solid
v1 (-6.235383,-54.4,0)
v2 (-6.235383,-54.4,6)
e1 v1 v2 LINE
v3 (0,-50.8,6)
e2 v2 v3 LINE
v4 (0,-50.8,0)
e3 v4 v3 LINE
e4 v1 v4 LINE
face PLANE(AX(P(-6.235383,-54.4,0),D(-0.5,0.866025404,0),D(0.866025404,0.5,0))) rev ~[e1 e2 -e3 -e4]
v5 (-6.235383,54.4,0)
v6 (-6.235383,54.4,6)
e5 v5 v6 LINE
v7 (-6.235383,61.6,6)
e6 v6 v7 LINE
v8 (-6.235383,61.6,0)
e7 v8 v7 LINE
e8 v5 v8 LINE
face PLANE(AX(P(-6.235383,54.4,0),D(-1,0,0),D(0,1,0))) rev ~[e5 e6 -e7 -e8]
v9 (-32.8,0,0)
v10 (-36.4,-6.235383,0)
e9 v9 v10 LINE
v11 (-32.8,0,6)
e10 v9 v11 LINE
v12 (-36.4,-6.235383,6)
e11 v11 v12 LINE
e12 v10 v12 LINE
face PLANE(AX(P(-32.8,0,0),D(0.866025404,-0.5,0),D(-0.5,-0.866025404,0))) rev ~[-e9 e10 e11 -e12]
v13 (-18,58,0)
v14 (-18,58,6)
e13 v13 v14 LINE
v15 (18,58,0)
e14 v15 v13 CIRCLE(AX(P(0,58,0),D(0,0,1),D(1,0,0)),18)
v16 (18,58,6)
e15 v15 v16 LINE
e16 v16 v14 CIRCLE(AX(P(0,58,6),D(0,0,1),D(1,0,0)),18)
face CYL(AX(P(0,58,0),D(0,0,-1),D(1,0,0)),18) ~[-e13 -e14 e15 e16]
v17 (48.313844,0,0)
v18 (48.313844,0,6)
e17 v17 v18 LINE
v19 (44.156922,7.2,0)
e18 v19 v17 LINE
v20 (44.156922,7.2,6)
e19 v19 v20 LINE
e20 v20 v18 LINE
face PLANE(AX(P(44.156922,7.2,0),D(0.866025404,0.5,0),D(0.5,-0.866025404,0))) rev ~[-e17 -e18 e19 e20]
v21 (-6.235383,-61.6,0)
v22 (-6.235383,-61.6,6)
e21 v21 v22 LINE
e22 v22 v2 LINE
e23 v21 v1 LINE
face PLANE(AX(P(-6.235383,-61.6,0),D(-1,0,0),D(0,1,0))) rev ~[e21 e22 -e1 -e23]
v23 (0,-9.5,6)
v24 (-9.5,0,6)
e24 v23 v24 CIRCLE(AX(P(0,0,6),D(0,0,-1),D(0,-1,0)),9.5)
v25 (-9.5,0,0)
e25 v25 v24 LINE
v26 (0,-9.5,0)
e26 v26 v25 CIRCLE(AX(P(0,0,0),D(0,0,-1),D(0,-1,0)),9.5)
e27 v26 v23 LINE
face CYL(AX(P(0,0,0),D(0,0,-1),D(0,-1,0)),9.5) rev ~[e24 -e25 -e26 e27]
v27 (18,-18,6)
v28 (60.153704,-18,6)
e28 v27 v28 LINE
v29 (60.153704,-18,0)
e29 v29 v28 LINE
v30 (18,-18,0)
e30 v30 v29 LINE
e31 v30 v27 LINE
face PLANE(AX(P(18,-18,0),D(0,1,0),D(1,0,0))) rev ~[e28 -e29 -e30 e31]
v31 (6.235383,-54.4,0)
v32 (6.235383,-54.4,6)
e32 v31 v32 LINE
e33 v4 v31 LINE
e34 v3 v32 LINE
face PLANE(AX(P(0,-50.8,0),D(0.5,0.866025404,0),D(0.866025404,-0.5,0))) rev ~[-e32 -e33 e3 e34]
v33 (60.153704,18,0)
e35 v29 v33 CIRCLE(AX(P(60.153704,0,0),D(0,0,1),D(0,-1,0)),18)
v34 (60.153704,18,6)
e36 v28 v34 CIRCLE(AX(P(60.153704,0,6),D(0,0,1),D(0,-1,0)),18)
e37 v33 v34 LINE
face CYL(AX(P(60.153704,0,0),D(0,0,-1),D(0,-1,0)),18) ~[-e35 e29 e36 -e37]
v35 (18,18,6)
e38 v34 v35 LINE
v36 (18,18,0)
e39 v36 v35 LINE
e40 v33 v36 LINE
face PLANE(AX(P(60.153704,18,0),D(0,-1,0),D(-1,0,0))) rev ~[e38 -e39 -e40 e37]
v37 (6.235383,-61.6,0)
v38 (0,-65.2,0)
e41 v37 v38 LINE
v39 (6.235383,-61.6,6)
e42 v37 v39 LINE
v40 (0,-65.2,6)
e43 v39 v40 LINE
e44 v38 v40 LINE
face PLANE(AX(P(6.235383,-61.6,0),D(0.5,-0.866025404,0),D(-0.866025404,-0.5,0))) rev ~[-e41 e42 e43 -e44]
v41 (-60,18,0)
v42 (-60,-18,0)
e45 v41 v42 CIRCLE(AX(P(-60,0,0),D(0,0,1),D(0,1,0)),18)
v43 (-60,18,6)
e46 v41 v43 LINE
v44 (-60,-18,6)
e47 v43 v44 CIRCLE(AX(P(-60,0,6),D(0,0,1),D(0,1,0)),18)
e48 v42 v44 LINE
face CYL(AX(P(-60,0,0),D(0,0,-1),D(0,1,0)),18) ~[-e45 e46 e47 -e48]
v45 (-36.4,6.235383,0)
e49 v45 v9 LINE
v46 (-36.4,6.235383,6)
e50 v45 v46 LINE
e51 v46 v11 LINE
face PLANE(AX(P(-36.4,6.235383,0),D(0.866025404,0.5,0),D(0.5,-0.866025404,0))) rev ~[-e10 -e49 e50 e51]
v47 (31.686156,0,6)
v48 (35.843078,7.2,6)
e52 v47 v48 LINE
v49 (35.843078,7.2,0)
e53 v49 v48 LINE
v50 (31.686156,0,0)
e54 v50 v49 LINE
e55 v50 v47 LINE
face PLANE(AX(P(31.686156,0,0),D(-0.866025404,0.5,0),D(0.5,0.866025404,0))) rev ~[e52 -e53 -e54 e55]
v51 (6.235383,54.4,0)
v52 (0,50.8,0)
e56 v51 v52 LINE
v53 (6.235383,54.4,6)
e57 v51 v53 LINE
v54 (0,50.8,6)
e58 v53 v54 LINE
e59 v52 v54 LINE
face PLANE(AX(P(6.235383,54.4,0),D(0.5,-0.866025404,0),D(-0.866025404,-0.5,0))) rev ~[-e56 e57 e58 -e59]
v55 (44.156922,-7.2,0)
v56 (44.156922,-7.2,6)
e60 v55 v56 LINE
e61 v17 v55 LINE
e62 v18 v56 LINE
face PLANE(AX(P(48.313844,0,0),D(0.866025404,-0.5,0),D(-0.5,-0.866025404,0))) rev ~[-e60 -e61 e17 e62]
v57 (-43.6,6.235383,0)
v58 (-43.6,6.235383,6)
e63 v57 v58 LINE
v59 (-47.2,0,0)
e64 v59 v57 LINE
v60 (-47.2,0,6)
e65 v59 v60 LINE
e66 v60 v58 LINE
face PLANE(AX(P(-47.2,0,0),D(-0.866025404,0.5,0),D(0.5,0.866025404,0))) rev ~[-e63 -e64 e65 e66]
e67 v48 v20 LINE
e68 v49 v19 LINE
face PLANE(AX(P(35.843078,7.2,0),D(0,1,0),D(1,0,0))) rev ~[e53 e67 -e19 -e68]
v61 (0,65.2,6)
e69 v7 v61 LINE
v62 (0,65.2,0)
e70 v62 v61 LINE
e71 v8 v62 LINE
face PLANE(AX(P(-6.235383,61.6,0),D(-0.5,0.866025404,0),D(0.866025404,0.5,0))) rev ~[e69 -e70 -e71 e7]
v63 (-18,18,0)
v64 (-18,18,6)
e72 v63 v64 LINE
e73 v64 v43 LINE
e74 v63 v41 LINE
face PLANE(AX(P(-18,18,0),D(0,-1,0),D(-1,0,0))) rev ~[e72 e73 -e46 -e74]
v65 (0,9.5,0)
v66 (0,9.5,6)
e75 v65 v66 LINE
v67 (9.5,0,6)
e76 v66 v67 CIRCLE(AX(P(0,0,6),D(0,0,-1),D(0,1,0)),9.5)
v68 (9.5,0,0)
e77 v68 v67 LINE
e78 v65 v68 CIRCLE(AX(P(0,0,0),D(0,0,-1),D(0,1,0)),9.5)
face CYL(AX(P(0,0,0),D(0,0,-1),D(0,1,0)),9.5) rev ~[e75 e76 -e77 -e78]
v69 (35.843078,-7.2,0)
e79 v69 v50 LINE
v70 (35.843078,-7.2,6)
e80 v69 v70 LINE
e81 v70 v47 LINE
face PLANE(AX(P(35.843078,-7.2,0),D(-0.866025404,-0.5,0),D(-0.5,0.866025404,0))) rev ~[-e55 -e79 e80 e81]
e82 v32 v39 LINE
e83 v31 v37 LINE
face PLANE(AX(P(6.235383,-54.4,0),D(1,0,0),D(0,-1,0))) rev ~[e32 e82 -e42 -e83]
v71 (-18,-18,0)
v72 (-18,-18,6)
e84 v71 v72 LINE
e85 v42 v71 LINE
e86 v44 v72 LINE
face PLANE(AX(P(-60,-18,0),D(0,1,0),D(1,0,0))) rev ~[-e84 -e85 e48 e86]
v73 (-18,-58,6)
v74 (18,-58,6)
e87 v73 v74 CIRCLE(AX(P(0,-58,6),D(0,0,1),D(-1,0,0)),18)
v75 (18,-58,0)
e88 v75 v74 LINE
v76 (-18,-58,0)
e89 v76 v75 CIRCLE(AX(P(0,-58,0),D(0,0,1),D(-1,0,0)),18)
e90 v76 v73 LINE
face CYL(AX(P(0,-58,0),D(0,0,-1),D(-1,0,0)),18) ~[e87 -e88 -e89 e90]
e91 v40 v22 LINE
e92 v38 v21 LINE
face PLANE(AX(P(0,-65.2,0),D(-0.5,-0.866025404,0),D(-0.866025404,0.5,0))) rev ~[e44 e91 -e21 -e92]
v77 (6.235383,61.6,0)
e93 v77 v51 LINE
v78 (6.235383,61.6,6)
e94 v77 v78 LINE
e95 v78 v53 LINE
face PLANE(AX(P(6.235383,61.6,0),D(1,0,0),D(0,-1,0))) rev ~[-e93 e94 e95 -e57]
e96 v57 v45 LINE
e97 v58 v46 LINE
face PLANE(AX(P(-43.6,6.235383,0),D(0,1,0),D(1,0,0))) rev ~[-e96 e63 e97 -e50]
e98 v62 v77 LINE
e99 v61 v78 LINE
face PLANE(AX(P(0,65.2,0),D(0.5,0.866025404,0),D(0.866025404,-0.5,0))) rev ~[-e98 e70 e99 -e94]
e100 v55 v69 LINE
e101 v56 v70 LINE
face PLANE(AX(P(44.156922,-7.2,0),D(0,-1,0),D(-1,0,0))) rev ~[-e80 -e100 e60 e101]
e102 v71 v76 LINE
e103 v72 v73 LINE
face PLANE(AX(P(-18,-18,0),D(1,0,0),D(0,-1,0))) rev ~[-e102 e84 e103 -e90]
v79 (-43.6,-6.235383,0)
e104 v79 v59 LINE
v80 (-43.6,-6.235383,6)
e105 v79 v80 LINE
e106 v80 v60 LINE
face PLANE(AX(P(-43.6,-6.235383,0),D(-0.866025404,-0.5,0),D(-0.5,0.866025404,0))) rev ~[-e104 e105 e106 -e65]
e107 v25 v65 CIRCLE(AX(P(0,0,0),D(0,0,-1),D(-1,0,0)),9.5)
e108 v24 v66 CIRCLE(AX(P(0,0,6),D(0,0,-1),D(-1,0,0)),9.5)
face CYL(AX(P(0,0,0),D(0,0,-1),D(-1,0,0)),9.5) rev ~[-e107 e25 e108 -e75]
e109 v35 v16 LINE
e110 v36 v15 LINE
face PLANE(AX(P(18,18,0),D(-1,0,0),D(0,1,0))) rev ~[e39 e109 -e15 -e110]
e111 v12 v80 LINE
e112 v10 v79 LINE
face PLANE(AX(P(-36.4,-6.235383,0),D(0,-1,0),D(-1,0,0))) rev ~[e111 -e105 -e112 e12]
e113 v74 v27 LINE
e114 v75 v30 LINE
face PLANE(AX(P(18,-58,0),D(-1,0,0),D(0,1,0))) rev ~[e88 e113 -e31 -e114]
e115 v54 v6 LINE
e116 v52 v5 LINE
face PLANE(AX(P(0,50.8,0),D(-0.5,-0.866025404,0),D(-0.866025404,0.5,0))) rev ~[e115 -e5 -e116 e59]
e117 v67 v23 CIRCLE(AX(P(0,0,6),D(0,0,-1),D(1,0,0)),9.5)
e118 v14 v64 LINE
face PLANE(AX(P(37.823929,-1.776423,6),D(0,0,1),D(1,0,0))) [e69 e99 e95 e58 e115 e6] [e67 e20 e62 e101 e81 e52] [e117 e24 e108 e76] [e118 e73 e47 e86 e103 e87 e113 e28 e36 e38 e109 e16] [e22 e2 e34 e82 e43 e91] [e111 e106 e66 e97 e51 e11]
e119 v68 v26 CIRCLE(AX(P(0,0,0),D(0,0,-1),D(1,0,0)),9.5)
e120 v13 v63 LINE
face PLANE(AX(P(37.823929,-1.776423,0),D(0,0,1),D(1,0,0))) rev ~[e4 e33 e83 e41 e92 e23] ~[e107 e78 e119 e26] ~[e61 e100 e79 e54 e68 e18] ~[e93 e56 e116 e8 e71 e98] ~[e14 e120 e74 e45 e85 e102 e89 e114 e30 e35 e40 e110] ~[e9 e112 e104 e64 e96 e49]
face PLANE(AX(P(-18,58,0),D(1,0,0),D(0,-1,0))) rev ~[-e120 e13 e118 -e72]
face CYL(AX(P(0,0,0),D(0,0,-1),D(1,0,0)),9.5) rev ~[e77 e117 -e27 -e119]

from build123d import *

# Parameters (mm, degrees)
F1_DEPTH = 6


with BuildPart() as f1:
    # F0 (on Top) → F1 (new body)
    with BuildSketch(Plane.XY):
        with BuildLine():
            Line((18, 0), (9.5, 0))
            ThreePointArc((9.5, 0), (6.7175144213, -6.7175144213), (0, -9.5))
            Line((0, -9.5), (0, -18))
            Line((0, -18), (18, -18))
            Line((18, -18), (40, -18))
            Line((40, -18), (60.1537041366, -18))
            ThreePointArc((60.1537041366, -18), (78.1537041366, 0), (60.1537041366, 18))
            Line((60.1537041366, 18), (40, 18))
            Line((40, 18), (18, 18))
            Line((18, 18), (18, 0))
        make_face()
        Polygon((35.8430780618, -7.2), (31.6861561237, 0), (35.8430780618, 7.2), (44.1569219382, 7.2), (48.3138438763, 0), (44.1569219382, -7.2), align=None, mode=Mode.SUBTRACT)
        with BuildLine():
            ThreePointArc((0, 9.5), (6.7175144213, 6.7175144213), (9.5, 0))
            Line((9.5, 0), (18, 0))
            Line((18, 0), (18, 18))
            Line((18, 18), (0, 18))
            Line((0, 18), (0, 9.5))
        make_face()
        with BuildLine():
            ThreePointArc((-9.5, 0), (-6.7175144213, 6.7175144213), (0, 9.5))
            Line((0, 9.5), (0, 18))
            Line((0, 18), (-18, 18))
            Line((-18, 18), (-18, 0))
            Line((-18, 0), (-9.5, 0))
        make_face()
        with BuildLine():
            Line((0, -18), (0, -9.5))
            ThreePointArc((0, -9.5), (-6.7175144213, -6.7175144213), (-9.5, 0))
            Line((-9.5, 0), (-18, 0))
            Line((-18, 0), (-18, -18))
            Line((-18, -18), (0, -18))
        make_face()
        Polygon((0, 40), (0, 18), (18, 18), (18, 58), (6.2353829072, 58), (6.2353829072, 54.4), (0, 50.8), align=None)
        Polygon((-18, 18), (0, 18), (0, 40), (0, 50.8), (-6.2353829072, 54.4), (-6.2353829072, 58), (-18, 58), (-18, 40), align=None)
        Polygon((0, -50.8), (0, -18), (-18, -18), (-18, -58), (-6.2353829072, -58), (-6.2353829072, -54.4), align=None)
        Polygon((18, -18), (0, -18), (0, -50.8), (6.2353829072, -54.4), (6.2353829072, -58), (18, -58), align=None)
        with BuildLine():
            Line((-18, -18), (-18, 0))
            Line((-18, 0), (-18, 18))
            Line((-18, 18), (-40, 18))
            Line((-40, 18), (-60, 18))
            ThreePointArc((-60, 18), (-78, 0), (-60, -18))
            Line((-60, -18), (-40, -18))
            Line((-40, -18), (-18, -18))
        make_face()
        Polygon((-36.4, 6.2353829072), (-32.8, 0), (-36.4, -6.2353829072), (-43.6, -6.2353829072), (-47.2, 0), (-43.6, 6.2353829072), align=None, mode=Mode.SUBTRACT)
        with BuildLine():
            Line((6.2353829072, 58), (18, 58))
            ThreePointArc((18, 58), (0, 76), (-18, 58))
            Line((-18, 58), (-6.2353829072, 58))
            Line((-6.2353829072, 58), (-6.2353829072, 61.6))
            Line((-6.2353829072, 61.6), (0, 65.2))
            Line((0, 65.2), (6.2353829072, 61.6))
            Line((6.2353829072, 61.6), (6.2353829072, 58))
        make_face()
        with BuildLine():
            Line((-6.2353829072, -58), (-18, -58))
            ThreePointArc((-18, -58), (0, -76), (18, -58))
            Line((18, -58), (6.2353829072, -58))
            Line((6.2353829072, -58), (6.2353829072, -61.6))
            Line((6.2353829072, -61.6), (0, -65.2))
            Line((0, -65.2), (-6.2353829072, -61.6))
            Line((-6.2353829072, -61.6), (-6.2353829072, -58))
        make_face()
    extrude(amount=F1_DEPTH)


solid = f1.part
